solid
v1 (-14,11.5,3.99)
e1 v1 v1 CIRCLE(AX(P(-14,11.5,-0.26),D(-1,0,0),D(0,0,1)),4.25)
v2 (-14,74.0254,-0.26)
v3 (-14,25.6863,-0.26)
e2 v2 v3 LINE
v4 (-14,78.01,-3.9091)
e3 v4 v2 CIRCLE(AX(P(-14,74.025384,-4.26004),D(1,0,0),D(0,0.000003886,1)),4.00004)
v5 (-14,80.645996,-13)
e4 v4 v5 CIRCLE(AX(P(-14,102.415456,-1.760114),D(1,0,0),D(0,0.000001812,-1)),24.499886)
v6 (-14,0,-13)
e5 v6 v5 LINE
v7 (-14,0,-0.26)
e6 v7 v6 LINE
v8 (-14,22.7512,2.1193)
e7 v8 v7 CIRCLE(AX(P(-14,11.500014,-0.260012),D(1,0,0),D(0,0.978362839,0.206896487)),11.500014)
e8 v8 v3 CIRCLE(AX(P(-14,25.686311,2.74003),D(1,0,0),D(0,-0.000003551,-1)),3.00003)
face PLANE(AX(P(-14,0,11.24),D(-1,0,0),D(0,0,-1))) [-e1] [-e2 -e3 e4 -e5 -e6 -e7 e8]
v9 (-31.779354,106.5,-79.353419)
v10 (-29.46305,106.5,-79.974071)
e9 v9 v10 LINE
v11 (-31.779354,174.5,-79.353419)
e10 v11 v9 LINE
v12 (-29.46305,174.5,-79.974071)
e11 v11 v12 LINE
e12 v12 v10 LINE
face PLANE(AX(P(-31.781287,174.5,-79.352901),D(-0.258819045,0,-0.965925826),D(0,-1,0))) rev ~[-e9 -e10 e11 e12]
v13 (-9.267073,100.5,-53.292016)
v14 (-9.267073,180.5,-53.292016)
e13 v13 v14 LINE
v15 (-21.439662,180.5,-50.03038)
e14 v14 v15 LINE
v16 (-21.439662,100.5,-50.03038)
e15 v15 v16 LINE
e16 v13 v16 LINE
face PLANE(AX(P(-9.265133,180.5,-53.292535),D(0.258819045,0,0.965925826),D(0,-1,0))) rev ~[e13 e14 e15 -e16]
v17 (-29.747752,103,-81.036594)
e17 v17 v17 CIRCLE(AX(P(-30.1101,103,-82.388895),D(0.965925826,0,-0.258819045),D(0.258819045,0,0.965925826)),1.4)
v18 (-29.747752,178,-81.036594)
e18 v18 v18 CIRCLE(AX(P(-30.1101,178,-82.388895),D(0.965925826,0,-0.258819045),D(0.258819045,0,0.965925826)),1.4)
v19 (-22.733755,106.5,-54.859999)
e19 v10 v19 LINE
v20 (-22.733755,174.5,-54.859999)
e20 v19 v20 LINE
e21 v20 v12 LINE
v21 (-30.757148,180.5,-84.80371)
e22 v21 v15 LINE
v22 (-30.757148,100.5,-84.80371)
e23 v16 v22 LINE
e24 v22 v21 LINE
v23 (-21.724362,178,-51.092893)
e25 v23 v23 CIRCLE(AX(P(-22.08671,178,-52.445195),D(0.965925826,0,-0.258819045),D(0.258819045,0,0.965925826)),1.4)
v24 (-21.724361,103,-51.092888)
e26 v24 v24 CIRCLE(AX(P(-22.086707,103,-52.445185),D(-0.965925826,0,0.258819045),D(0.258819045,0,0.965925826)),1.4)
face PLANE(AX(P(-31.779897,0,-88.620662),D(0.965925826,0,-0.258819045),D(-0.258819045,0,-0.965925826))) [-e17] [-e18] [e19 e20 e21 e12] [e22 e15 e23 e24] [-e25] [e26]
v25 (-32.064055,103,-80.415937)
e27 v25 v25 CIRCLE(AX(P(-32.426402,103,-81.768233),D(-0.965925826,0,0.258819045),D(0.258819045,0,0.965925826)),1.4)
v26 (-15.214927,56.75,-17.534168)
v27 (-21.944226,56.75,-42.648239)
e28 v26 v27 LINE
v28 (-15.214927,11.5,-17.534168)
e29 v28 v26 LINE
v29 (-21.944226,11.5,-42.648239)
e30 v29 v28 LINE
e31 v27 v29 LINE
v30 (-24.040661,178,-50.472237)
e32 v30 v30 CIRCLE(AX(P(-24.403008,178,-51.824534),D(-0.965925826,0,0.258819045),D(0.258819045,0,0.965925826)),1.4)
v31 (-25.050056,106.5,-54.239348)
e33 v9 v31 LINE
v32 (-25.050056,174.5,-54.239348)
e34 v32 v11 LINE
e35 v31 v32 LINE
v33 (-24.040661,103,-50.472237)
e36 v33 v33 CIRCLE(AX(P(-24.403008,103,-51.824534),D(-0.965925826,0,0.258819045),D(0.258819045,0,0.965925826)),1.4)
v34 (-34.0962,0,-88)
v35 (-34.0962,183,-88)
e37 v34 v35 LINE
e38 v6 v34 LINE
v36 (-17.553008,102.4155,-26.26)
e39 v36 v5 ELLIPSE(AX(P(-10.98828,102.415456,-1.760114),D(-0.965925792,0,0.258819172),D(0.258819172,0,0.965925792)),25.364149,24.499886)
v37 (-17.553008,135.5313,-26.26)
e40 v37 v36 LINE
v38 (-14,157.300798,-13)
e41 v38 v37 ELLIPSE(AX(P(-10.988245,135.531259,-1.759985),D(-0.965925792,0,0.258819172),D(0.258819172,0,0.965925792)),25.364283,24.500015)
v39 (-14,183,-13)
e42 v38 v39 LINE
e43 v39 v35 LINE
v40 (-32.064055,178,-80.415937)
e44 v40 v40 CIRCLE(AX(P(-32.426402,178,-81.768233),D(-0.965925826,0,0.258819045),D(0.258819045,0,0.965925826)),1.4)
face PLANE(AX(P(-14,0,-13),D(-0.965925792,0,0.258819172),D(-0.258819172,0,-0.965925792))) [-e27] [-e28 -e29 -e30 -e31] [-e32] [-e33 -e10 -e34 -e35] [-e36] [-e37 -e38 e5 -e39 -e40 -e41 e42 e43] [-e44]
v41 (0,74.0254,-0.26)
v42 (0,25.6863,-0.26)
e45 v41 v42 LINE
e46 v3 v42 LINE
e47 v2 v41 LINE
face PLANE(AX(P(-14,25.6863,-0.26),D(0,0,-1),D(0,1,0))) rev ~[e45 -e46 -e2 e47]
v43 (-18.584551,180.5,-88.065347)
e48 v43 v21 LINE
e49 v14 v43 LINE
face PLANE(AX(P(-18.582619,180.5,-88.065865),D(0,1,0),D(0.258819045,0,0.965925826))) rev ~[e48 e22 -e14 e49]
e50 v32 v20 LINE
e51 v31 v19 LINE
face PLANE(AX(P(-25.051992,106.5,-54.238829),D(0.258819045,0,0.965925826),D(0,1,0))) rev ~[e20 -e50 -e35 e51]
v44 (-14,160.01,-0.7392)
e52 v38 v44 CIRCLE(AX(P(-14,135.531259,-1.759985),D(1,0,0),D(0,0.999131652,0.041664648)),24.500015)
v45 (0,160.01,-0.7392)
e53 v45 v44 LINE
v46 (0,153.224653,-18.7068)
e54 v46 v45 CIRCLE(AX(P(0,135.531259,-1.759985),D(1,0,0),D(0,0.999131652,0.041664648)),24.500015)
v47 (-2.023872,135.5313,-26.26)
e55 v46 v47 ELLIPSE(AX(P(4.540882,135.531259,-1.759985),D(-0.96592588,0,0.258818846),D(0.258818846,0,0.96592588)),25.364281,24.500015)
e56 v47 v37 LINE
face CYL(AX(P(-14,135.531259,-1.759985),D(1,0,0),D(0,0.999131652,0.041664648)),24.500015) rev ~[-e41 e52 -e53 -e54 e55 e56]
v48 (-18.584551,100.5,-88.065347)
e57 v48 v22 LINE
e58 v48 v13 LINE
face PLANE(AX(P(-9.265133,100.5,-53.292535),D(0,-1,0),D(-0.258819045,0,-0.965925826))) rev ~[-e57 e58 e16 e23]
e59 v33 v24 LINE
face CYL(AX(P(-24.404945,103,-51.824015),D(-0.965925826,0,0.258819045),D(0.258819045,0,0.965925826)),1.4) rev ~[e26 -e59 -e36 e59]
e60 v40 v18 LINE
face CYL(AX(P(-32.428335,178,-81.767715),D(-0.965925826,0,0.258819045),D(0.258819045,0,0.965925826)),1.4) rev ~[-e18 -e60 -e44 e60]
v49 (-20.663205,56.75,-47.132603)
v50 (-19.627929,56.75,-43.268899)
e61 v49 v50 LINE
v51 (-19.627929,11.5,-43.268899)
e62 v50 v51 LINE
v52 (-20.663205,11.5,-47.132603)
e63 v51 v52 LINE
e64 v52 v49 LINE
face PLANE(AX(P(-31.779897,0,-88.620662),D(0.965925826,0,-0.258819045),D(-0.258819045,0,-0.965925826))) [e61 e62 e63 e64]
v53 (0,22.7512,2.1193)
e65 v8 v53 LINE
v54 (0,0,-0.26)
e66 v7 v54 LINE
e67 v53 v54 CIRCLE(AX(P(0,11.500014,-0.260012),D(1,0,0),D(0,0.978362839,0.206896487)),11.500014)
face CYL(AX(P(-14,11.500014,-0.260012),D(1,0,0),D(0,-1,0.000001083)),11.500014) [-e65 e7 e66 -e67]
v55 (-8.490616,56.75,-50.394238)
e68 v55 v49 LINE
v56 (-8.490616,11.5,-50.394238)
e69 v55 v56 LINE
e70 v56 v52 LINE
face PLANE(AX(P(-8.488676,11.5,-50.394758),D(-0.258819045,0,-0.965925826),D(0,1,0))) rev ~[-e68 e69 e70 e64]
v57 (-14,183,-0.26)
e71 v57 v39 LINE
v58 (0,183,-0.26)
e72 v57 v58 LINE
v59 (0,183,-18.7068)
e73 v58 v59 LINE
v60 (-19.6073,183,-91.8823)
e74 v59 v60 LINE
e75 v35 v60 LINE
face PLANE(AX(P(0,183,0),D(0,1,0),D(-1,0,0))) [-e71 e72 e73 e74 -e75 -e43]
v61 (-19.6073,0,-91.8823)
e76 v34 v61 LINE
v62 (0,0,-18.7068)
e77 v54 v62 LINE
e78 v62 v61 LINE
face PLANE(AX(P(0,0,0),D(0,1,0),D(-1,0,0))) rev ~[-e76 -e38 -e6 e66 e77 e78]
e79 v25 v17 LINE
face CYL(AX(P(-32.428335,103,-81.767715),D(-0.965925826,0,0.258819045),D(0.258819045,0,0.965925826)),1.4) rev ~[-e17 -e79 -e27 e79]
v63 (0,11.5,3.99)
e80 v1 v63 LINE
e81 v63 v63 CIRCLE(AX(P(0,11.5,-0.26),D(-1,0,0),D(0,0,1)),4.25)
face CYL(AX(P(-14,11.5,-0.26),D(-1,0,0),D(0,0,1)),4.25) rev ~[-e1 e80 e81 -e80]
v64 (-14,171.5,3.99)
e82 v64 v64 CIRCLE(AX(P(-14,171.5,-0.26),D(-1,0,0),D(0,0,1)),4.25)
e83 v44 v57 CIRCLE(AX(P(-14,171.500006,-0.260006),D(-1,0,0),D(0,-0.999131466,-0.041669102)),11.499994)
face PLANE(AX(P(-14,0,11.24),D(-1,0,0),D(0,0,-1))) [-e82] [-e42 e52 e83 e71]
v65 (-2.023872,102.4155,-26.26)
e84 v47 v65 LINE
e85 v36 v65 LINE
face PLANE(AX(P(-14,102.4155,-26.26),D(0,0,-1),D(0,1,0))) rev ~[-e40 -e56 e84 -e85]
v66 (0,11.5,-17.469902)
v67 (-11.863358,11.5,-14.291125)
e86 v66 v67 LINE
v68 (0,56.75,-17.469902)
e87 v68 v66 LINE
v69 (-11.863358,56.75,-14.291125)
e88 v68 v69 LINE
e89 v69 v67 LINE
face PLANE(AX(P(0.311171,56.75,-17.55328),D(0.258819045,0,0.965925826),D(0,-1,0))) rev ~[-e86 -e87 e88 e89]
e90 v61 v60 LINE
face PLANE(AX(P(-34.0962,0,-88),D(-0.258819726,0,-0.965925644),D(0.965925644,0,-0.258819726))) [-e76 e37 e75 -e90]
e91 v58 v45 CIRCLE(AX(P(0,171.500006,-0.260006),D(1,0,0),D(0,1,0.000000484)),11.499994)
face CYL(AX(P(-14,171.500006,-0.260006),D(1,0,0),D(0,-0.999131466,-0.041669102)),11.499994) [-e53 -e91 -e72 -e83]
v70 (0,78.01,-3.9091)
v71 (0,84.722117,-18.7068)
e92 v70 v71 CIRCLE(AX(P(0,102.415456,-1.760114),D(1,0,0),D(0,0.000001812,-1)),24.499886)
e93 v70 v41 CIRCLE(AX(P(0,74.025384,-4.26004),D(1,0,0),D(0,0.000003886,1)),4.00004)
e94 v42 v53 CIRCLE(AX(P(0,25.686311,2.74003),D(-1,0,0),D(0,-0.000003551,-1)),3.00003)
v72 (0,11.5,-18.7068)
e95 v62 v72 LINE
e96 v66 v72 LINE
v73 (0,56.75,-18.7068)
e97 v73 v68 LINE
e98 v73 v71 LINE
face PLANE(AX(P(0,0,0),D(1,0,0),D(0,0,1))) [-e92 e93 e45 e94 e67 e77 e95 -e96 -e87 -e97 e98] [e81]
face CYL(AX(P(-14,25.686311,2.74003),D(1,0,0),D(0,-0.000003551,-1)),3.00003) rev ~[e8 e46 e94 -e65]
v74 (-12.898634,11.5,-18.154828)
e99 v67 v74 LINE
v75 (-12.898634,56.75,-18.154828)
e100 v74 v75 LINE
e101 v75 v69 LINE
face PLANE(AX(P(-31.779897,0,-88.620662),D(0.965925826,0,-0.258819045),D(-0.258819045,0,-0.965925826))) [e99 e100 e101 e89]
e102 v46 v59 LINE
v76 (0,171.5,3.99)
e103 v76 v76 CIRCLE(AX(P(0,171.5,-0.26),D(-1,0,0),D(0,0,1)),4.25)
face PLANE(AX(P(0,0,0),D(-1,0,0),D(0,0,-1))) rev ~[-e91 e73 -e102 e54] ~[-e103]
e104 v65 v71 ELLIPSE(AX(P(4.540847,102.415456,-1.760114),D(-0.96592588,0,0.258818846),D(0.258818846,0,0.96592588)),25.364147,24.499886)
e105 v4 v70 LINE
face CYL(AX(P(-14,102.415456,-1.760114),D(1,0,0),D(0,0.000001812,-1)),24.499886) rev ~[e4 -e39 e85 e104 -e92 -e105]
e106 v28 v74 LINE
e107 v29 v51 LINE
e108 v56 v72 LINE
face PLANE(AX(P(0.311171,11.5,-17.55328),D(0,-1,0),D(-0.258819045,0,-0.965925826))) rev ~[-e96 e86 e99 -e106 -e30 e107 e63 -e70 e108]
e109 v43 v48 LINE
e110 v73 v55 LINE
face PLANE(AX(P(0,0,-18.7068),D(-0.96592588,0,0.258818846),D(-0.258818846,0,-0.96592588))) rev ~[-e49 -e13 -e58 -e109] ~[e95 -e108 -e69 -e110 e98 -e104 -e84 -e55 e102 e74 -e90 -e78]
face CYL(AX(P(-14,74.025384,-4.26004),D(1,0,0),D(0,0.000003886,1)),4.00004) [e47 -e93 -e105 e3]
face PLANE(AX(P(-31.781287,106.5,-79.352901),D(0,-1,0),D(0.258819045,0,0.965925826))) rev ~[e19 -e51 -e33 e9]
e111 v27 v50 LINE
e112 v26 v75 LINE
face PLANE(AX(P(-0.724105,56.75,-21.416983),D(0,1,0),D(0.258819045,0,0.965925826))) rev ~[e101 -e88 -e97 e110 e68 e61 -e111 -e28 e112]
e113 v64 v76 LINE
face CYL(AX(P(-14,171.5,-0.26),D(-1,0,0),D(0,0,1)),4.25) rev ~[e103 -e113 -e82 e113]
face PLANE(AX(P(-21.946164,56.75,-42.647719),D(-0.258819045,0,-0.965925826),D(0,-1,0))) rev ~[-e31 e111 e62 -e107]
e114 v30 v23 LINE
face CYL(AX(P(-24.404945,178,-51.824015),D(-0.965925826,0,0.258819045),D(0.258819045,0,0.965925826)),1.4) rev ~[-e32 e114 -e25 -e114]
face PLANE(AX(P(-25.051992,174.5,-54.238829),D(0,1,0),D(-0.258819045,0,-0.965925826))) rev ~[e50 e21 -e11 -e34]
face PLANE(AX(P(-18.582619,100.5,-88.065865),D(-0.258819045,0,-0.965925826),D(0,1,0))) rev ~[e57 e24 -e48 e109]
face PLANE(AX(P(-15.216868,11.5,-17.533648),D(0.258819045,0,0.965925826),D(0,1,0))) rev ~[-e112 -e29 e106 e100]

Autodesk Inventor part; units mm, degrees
ref_plane "YZ Plane" through (0, 0, 0) normal (1, 0, 0) x (0, 1, 0)
ref_plane "XZ Plane" through (0, 0, 0) normal (0, 1, 0) x (-1, 0, 0)
ref_plane "XY Plane" through (0, 0, 0) normal (0, 0, 1) x (1, 0, 0)
sketch "Sketch1" plane through (0, 0, 0) normal (0, 1, 0) x (-1, 0, 0)
  line L0 (0, 0) -> (0, -18.7068)
  line L1 (0, -18.7068) -> (19.6073, -91.8823)
  line L2 (0, 0) -> (0, 11.24)
  line L3 (0, 11.24) -> (14, 11.24)
  line L4 (14, 11.24) -> (14, -13)
  line L5 (14, -13) -> (34.0962, -88)
  line L6 (34.0962, -88) -> (19.6073, -91.8823)
  dimension "d1" = 14
  dimension "d2" = 11.24
  dimension "d4" = 15
  dimension "d13" = 15
  dimension "d14" = 13
  dimension "d35" = 88
extrude "Extrusion1" add sketch "Sketch1" along normal blind 183
sketch "Sketch2" plane through (-14, 0, -13) normal (-1, 0, 0) x (0, 0, 1)
  line L0 (0, 183) -> (24.24, 183) projected
  circle A0 centre (12.74, 171.5) radius 4.25
  circle A1 centre (12.74, 11.5) radius 4.25
  line L1 (24.24, 0) -> (24.24, 183) projected
  line L2 (0, 0) -> (24.24, 0) projected
  arc A2 (12.74, 0) -> (15.1193, 22.7512) centre (12.74, 11.5) ccw
  arc A3 (12.2608, 160.01) -> (12.74, 183) centre (12.74, 171.5) ccw
  line L3 (-13.26, 102.4155) -> (-13.26, 135.5313)
  arc A4 (12.2608, 160.01) -> (-13.26, 135.5313) centre (11.24, 135.5313) ccw
  circle A5 centre (20.1015, 118.5) radius 28 construction
  line L4 (12.74, 25.6863) -> (12.74, 74.0254)
  arc A6 (12.74, 25.6863) -> (15.1193, 22.7512) centre (15.74, 25.6863) ccw
  arc A7 (-13.26, 102.4155) -> (9.0909, 78.01) centre (11.24, 102.4155) ccw
  arc A8 (12.74, 74.0254) -> (9.0909, 78.01) centre (8.74, 74.0254) ccw
  line L5 (24.24, 0) -> (24.24, 183) projected
  line L6 (12.74, 0) -> (24.24, 0)
  line L7 (24.24, 11.5) -> (24.24, 171.5)
  line L8 (24.24, 183) -> (12.74, 183)
  line L9 (24.24, 11.5) -> (24.24, 0)
  line L10 (24.24, 171.5) -> (24.24, 183)
  point P0 (13, 0)
  point P1 (12.74, 23)
  point P2 (12.74, 77.9615)
  dimension "d17" = 160
  dimension "d18" = 183
  dimension "d19" = 11.5
  dimension "d20" = 11.5
  dimension "d21" = 11.5
  dimension "d22" = 26
  dimension "d23" = 56
  dimension "d24" = 53
  dimension "d25" = 3
  dimension "d26" = 0
  dimension "d27" = 24.5
  dimension "d28" = 4
  dimension "d30" = 82
  dimension "d31" = 8.5
  dimension "d32" = 4.1385
extrude "Extrusion2" cut sketch "Sketch2" along normal through all both and the other way through all
sketch "Sketch3" plane through (-34.0962, 0, -88) normal (-0.9659258, 0, 0.258819) x (0.258819, 0, 0.9659258)
  line L0 (46.9516, 11.5) -> (72.9516, 11.5)
  line L1 (72.9516, 11.5) -> (72.9516, 56.75)
  line L2 (72.9516, 56.75) -> (46.9516, 56.75)
  line L3 (46.9516, 56.75) -> (46.9516, 11.5)
  ellipse E0 centre (89.9516, 11.5) end of major axis (89.9516, 23) minor radius 11.1081 (89.9516, 0) -> (92.2498, 22.7512) ccw projected
  line L4 (8.9516, 106.5) -> (34.9516, 106.5)
  line L5 (34.9516, 106.5) -> (34.9516, 174.5)
  line L6 (34.9516, 174.5) -> (8.9516, 174.5)
  line L7 (8.9516, 174.5) -> (8.9516, 106.5)
  circle A0 centre (6.4516, 103) radius 1.4
  circle A1 centre (37.4516, 103) radius 1.4
  circle A2 centre (37.4516, 178) radius 1.4
  circle A3 centre (6.4516, 178) radius 1.4
  line L8 (6.4516, 103) -> (37.4516, 103) construction
  line L9 (37.4516, 103) -> (37.4516, 178) construction
  line L10 (37.4516, 178) -> (6.4516, 178) construction
  line L11 (6.4516, 178) -> (6.4516, 103) construction
  point P0 (93.8262, 0)
  dimension "d36" = 45.25
  dimension "d37" = 26
  dimension "d38" = 17
  dimension "d39" = 0
  dimension "d46" = 26
  dimension "d47" = 31
  dimension "d48" = 75
  dimension "d49" = 3.5
  dimension "d50" = 68
  dimension "d51" = 2.5
  dimension "d52" = 55
  dimension "d53" = 95
  dimension "d54" = 2.8
extrude "top" cut sketch "Sketch3" against normal blind 183
sketch "Sketch4" plane through (-19.6073, 0, -91.8823) normal (0.9659258, 0, -0.258819) x (-0.258819, 0, -0.9659258)
  line L0 (-46.9516, 56.75) -> (-46.9516, 11.5) projected
  line L1 (-72.9516, 11.5) -> (-72.9516, 56.75) projected
  line L2 (-42.9516, 56.75) -> (-76.9516, 56.75)
  line L3 (-76.9516, 56.75) -> (-76.9516, 11.5)
  line L4 (-76.9516, 11.5) -> (-42.9516, 11.5)
  line L5 (-42.9516, 11.5) -> (-42.9516, 56.75)
  line L6 (-72.9516, 56.75) -> (-46.9516, 56.75) projected
  line L7 (-46.9516, 11.5) -> (-72.9516, 11.5) projected
  line L8 (-3.9516, 180.5) -> (-39.9516, 180.5)
  line L9 (-39.9516, 180.5) -> (-39.9516, 100.5)
  line L10 (-39.9516, 100.5) -> (-3.9516, 100.5)
  line L11 (-3.9516, 100.5) -> (-3.9516, 180.5)
  circle A0 centre (-6.4516, 103) radius 1.4 projected
  circle A1 centre (-6.4516, 178) radius 1.4 projected
  circle A2 centre (-37.4516, 178) radius 1.4 projected
  point P0 (-93.8262, 0)
  dimension "d42" = 4
  dimension "d43" = 4
  dimension "d55" = 2.5
  dimension "d56" = 2.5
  dimension "d57" = 2.5
  dimension "d59" = 2.5
extrude "back" cut sketch "Sketch4" against normal blind 12.6 contours L2 L5 L4 L0 | L1 L4 L3 L2 | L11 L10 L9 L8
equation "\"d19\" = -0.5 * d17 + 0.5 * d18"
equation "\"d21\" = d20"
equation "\"d49\" = -0.5 * d50 + 0.5 * d48"
equation "\"d51\" = -0.5 * d46 + 0.5 * d47"
equation "\"d43\" = d42"
equation "\"d56\" = d55"
equation "\"d57\" = d55"
equation "\"d59\" = d55"
properties part number "dash"
